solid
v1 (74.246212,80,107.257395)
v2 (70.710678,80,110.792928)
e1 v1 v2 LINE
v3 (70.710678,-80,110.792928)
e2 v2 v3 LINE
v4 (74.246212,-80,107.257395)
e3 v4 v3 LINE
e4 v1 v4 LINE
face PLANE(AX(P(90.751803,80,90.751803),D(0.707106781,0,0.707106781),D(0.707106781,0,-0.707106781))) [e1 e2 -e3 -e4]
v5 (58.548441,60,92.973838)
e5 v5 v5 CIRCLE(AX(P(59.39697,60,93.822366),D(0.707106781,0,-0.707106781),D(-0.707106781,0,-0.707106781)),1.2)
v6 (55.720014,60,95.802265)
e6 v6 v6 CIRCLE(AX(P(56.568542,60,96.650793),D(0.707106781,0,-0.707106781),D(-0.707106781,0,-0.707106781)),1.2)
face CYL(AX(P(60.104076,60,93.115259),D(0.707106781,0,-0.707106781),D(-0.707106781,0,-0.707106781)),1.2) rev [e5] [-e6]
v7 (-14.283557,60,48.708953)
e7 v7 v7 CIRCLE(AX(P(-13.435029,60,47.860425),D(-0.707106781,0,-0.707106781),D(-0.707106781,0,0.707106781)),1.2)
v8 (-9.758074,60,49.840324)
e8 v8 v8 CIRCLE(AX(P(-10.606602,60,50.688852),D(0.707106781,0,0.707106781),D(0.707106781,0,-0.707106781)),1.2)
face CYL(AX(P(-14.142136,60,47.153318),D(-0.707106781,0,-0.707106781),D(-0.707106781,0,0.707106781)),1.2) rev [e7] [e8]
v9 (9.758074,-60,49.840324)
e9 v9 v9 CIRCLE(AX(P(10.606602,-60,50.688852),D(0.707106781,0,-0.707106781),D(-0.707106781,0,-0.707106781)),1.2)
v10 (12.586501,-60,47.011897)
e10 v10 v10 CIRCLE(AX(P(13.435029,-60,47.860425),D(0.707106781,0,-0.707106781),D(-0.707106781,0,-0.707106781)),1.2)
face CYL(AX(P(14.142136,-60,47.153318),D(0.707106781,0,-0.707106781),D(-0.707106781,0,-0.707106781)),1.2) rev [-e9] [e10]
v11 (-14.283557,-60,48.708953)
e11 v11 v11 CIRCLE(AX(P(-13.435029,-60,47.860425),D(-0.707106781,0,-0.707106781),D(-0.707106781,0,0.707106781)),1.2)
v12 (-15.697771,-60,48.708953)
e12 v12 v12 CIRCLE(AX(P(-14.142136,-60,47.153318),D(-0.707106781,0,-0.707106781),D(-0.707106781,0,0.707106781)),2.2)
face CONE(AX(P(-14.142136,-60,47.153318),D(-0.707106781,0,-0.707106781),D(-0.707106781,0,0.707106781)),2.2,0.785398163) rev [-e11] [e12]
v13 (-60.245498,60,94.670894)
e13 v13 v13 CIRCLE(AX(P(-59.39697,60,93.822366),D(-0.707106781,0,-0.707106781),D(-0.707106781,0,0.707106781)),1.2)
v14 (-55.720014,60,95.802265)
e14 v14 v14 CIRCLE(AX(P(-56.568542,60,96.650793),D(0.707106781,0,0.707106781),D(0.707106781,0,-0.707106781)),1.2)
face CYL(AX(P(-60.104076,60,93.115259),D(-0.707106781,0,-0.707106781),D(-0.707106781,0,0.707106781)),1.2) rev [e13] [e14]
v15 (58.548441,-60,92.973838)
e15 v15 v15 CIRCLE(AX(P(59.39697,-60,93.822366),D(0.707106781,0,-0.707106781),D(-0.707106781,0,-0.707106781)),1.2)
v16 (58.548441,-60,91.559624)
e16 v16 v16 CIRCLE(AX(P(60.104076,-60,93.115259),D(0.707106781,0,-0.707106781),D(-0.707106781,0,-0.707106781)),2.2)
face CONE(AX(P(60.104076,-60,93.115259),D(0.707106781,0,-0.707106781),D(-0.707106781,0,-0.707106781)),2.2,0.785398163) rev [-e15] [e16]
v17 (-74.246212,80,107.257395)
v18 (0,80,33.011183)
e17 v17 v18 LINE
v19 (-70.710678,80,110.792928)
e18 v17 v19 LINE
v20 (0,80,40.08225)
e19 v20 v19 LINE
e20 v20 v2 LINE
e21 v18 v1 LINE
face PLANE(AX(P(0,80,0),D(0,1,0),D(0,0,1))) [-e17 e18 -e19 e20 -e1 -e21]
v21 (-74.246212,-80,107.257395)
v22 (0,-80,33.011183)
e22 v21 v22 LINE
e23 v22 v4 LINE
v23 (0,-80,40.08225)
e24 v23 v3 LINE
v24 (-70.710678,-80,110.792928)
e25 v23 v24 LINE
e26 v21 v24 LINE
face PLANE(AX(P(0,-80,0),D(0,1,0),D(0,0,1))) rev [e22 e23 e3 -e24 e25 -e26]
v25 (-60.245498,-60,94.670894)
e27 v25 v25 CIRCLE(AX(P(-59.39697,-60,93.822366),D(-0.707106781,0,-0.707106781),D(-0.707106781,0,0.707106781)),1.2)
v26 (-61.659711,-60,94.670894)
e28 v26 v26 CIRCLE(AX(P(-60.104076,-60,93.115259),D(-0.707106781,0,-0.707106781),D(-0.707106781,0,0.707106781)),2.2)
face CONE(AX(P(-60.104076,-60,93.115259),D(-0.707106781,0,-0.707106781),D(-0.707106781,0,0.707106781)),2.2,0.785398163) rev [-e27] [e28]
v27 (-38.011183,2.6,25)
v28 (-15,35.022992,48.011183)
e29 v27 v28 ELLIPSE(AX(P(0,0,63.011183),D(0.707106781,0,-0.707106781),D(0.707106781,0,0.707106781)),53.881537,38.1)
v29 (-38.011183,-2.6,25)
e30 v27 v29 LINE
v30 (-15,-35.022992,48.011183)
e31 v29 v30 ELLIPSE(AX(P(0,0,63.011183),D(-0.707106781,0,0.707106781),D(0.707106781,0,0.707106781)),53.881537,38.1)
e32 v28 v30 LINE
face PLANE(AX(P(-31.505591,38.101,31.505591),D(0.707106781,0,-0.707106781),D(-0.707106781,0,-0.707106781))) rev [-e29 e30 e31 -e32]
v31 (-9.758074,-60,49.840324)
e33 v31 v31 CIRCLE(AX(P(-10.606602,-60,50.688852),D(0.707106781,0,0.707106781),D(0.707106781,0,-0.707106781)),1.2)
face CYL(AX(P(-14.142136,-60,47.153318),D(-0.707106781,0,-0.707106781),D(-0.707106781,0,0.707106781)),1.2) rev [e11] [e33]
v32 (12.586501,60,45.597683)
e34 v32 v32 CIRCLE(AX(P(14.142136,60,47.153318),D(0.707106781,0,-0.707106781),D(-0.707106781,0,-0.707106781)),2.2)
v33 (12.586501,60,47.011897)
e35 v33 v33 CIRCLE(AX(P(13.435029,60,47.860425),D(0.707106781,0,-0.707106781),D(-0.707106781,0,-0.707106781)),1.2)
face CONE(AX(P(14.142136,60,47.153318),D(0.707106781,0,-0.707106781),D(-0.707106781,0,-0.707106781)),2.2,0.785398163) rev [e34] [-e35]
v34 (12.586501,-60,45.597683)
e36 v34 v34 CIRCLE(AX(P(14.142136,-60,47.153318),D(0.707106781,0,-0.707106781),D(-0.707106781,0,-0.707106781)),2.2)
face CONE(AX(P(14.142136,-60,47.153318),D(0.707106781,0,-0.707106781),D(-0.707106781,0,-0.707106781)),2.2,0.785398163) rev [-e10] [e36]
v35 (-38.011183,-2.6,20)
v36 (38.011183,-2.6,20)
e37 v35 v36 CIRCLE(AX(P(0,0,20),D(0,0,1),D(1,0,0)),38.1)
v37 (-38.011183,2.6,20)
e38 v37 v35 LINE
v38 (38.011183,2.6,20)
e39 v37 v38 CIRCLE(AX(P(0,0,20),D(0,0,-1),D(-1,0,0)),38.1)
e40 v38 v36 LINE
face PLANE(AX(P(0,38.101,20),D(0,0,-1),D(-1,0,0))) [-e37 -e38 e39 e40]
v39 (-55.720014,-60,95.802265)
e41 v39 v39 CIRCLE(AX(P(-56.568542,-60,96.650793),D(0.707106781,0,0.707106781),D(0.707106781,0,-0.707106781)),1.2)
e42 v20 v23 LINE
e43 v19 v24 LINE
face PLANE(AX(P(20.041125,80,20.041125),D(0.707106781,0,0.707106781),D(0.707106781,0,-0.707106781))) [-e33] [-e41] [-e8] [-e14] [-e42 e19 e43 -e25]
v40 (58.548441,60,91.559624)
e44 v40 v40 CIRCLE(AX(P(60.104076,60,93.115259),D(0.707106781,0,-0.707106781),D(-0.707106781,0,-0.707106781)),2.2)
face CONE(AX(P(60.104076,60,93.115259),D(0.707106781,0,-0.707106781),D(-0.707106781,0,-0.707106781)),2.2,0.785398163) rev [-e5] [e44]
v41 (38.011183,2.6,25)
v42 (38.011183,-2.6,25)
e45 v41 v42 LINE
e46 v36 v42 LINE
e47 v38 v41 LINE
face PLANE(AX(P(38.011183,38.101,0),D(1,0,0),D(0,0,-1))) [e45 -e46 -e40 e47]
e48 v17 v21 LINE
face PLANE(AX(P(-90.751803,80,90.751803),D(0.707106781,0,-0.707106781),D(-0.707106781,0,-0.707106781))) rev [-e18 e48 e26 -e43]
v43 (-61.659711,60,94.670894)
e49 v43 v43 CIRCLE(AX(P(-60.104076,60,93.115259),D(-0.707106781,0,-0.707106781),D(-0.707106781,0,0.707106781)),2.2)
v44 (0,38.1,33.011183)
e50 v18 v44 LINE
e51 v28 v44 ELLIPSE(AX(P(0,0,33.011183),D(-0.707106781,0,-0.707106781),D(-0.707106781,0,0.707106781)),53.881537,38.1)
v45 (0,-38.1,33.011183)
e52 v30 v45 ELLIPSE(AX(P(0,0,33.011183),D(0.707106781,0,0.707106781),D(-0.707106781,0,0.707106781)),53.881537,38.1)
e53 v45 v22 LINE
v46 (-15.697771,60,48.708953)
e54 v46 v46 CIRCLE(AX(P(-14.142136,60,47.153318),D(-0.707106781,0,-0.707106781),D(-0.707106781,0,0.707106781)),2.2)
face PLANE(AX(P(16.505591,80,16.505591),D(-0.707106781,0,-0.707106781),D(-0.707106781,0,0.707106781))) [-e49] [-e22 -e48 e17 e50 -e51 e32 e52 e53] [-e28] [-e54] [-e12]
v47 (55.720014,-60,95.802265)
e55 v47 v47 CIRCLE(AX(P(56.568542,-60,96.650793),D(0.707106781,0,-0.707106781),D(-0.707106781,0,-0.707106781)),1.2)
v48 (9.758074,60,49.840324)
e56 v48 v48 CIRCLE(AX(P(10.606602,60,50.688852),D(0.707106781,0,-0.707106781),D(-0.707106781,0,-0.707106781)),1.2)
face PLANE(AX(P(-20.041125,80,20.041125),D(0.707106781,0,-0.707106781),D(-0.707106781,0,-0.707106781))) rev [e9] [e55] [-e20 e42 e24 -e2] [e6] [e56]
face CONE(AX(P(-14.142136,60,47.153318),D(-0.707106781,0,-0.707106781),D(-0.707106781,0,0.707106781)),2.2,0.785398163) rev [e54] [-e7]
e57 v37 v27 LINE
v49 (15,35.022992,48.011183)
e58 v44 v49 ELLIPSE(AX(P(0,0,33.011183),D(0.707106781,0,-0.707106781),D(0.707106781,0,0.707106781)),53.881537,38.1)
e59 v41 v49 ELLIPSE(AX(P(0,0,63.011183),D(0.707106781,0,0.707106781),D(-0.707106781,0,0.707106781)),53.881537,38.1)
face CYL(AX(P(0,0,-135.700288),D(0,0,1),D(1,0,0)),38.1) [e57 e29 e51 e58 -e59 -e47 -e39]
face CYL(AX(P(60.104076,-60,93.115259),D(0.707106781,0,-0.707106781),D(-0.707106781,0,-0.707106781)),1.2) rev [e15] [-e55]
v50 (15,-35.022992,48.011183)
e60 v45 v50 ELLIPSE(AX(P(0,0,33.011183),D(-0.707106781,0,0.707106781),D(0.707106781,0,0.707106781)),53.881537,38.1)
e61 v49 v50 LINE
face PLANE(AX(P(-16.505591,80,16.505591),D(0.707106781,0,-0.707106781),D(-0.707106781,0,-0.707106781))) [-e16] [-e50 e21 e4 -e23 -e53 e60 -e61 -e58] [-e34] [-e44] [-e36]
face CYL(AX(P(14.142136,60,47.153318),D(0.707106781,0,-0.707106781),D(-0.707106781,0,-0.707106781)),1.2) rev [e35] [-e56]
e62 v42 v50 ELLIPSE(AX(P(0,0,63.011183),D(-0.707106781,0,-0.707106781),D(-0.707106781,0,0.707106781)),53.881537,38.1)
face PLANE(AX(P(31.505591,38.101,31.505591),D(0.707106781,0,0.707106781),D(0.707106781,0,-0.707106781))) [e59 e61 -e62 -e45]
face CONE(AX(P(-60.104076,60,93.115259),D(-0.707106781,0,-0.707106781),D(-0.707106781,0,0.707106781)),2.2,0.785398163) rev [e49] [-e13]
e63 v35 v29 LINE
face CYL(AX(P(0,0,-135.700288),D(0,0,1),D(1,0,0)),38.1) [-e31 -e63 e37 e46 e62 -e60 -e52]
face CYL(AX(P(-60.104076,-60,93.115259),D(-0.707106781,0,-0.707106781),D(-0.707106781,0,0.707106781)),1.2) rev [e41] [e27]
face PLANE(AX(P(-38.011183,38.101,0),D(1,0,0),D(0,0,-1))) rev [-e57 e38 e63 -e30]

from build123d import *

# Parameters (mm, degrees)
BOSS_EXTRUDE1_START                             = -38.1
BOSS_EXTRUDE1_DEPTH                             = 76.2
BOSS_EXTRUDE1_START_2                           = 20
BOSS_EXTRUDE1_2_DEPTH                           = 29
BOSS_EXTRUDE2_DEPTH                             = 80
CSK_FOR_M2_FLAT_HEAD_MACHINE_SCREW1_D           = 2.4
CSK_FOR_M2_FLAT_HEAD_MACHINE_SCREW1_CSINK_D     = 4.4
CSK_FOR_M2_FLAT_HEAD_MACHINE_SCREW1_CSINK_ANGLE = 90


with BuildPart() as part:
    # Boss-Extrude1: read off the stored shape, not the designer's step
    # Boss-Extrude1 outline → Boss-Extrude1 (new body)
    with BuildSketch(Plane(origin=(0, 0, 0), x_dir=(1, 0, 0), z_dir=(0, 1, 0)).offset(BOSS_EXTRUDE1_START)):
        Polygon((-15, -48.011182565), (0, -33.011182565), (15, -48.011182565), (38.011182565, -25), (38.011182565, -20), (-38.011182565, -20), (-38.011182565, -25), align=None)
    extrude(amount=BOSS_EXTRUDE1_DEPTH)

    # Boss-Extrude1 2 outline → Boss-Extrude1 2 (cut)
    with BuildSketch(Plane.XY.offset(BOSS_EXTRUDE1_START_2)):
        with BuildLine():
            ThreePointArc((0, 38.1), (26.005287924, 27.844837942), (38.011182565, 2.6))
            Line((38.011182565, 2.6), (38.011182565, 38.1))
            Line((38.011182565, 38.1), (0, 38.1))
        make_face()
        with BuildLine():
            ThreePointArc((-38.011182565, 2.6), (-26.005287924, 27.844837942), (0, 38.1))
            Line((0, 38.1), (-38.011182565, 38.1))
            Line((-38.011182565, 38.1), (-38.011182565, 2.6))
        make_face()
        with BuildLine():
            Line((38.011182565, -38.1), (38.011182565, -2.6))
            ThreePointArc((38.011182565, -2.6), (26.005287924, -27.844837942), (0, -38.1))
            Line((0, -38.1), (38.011182565, -38.1))
        make_face()
        with BuildLine():
            Line((-38.011182565, -38.1), (0, -38.1))
            ThreePointArc((0, -38.1), (-26.005287924, -27.844837942), (-38.011182565, -2.6))
            Line((-38.011182565, -2.6), (-38.011182565, -38.1))
        make_face()
    extrude(amount=BOSS_EXTRUDE1_2_DEPTH, mode=Mode.SUBTRACT)

    # Sketch1<3> → Boss-Extrude2 (add, symmetric)
    with BuildSketch(Plane(origin=(0, 0, 0), x_dir=(1, 0, 0), z_dir=(0, 1, 0))):
        Polygon((0, -33.011182565), (15, -48.011182565), (74.246212025, -107.25739459), (70.710678119, -110.792928496), (0, -40.082250377), (-70.710678119, -110.792928496), (-74.246212025, -107.25739459), (-15, -48.011182565), align=None)
    extrude(amount=BOSS_EXTRUDE2_DEPTH, both=True)

    # CSK for M2 Flat Head Machine Screw1 (through all)
    with Locations(Plane(origin=(16.505591283, 0, 16.505591283), x_dir=(-0.7071067811865441, 0, 0.7071067811865509), z_dir=(-0.7071067811865509, 0, -0.7071067811865441))):
        with Locations((108.342431047, 60), (43.342431047, 60), (43.342431047, -60), (108.342431047, -60)):
            csk_for_m2_flat_head_machine_screw1 = CounterSinkHole(CSK_FOR_M2_FLAT_HEAD_MACHINE_SCREW1_D / 2, CSK_FOR_M2_FLAT_HEAD_MACHINE_SCREW1_CSINK_D / 2, counter_sink_angle=CSK_FOR_M2_FLAT_HEAD_MACHINE_SCREW1_CSINK_ANGLE)

    # Mirror1: CSK for M2 Flat Head Machine Screw1 across plane
    add(csk_for_m2_flat_head_machine_screw1.mirror(Plane(origin=(0, 0, 0), x_dir=(0, 0, 1), z_dir=(1, 0, 0))), mode=Mode.SUBTRACT)


solid = part.part
